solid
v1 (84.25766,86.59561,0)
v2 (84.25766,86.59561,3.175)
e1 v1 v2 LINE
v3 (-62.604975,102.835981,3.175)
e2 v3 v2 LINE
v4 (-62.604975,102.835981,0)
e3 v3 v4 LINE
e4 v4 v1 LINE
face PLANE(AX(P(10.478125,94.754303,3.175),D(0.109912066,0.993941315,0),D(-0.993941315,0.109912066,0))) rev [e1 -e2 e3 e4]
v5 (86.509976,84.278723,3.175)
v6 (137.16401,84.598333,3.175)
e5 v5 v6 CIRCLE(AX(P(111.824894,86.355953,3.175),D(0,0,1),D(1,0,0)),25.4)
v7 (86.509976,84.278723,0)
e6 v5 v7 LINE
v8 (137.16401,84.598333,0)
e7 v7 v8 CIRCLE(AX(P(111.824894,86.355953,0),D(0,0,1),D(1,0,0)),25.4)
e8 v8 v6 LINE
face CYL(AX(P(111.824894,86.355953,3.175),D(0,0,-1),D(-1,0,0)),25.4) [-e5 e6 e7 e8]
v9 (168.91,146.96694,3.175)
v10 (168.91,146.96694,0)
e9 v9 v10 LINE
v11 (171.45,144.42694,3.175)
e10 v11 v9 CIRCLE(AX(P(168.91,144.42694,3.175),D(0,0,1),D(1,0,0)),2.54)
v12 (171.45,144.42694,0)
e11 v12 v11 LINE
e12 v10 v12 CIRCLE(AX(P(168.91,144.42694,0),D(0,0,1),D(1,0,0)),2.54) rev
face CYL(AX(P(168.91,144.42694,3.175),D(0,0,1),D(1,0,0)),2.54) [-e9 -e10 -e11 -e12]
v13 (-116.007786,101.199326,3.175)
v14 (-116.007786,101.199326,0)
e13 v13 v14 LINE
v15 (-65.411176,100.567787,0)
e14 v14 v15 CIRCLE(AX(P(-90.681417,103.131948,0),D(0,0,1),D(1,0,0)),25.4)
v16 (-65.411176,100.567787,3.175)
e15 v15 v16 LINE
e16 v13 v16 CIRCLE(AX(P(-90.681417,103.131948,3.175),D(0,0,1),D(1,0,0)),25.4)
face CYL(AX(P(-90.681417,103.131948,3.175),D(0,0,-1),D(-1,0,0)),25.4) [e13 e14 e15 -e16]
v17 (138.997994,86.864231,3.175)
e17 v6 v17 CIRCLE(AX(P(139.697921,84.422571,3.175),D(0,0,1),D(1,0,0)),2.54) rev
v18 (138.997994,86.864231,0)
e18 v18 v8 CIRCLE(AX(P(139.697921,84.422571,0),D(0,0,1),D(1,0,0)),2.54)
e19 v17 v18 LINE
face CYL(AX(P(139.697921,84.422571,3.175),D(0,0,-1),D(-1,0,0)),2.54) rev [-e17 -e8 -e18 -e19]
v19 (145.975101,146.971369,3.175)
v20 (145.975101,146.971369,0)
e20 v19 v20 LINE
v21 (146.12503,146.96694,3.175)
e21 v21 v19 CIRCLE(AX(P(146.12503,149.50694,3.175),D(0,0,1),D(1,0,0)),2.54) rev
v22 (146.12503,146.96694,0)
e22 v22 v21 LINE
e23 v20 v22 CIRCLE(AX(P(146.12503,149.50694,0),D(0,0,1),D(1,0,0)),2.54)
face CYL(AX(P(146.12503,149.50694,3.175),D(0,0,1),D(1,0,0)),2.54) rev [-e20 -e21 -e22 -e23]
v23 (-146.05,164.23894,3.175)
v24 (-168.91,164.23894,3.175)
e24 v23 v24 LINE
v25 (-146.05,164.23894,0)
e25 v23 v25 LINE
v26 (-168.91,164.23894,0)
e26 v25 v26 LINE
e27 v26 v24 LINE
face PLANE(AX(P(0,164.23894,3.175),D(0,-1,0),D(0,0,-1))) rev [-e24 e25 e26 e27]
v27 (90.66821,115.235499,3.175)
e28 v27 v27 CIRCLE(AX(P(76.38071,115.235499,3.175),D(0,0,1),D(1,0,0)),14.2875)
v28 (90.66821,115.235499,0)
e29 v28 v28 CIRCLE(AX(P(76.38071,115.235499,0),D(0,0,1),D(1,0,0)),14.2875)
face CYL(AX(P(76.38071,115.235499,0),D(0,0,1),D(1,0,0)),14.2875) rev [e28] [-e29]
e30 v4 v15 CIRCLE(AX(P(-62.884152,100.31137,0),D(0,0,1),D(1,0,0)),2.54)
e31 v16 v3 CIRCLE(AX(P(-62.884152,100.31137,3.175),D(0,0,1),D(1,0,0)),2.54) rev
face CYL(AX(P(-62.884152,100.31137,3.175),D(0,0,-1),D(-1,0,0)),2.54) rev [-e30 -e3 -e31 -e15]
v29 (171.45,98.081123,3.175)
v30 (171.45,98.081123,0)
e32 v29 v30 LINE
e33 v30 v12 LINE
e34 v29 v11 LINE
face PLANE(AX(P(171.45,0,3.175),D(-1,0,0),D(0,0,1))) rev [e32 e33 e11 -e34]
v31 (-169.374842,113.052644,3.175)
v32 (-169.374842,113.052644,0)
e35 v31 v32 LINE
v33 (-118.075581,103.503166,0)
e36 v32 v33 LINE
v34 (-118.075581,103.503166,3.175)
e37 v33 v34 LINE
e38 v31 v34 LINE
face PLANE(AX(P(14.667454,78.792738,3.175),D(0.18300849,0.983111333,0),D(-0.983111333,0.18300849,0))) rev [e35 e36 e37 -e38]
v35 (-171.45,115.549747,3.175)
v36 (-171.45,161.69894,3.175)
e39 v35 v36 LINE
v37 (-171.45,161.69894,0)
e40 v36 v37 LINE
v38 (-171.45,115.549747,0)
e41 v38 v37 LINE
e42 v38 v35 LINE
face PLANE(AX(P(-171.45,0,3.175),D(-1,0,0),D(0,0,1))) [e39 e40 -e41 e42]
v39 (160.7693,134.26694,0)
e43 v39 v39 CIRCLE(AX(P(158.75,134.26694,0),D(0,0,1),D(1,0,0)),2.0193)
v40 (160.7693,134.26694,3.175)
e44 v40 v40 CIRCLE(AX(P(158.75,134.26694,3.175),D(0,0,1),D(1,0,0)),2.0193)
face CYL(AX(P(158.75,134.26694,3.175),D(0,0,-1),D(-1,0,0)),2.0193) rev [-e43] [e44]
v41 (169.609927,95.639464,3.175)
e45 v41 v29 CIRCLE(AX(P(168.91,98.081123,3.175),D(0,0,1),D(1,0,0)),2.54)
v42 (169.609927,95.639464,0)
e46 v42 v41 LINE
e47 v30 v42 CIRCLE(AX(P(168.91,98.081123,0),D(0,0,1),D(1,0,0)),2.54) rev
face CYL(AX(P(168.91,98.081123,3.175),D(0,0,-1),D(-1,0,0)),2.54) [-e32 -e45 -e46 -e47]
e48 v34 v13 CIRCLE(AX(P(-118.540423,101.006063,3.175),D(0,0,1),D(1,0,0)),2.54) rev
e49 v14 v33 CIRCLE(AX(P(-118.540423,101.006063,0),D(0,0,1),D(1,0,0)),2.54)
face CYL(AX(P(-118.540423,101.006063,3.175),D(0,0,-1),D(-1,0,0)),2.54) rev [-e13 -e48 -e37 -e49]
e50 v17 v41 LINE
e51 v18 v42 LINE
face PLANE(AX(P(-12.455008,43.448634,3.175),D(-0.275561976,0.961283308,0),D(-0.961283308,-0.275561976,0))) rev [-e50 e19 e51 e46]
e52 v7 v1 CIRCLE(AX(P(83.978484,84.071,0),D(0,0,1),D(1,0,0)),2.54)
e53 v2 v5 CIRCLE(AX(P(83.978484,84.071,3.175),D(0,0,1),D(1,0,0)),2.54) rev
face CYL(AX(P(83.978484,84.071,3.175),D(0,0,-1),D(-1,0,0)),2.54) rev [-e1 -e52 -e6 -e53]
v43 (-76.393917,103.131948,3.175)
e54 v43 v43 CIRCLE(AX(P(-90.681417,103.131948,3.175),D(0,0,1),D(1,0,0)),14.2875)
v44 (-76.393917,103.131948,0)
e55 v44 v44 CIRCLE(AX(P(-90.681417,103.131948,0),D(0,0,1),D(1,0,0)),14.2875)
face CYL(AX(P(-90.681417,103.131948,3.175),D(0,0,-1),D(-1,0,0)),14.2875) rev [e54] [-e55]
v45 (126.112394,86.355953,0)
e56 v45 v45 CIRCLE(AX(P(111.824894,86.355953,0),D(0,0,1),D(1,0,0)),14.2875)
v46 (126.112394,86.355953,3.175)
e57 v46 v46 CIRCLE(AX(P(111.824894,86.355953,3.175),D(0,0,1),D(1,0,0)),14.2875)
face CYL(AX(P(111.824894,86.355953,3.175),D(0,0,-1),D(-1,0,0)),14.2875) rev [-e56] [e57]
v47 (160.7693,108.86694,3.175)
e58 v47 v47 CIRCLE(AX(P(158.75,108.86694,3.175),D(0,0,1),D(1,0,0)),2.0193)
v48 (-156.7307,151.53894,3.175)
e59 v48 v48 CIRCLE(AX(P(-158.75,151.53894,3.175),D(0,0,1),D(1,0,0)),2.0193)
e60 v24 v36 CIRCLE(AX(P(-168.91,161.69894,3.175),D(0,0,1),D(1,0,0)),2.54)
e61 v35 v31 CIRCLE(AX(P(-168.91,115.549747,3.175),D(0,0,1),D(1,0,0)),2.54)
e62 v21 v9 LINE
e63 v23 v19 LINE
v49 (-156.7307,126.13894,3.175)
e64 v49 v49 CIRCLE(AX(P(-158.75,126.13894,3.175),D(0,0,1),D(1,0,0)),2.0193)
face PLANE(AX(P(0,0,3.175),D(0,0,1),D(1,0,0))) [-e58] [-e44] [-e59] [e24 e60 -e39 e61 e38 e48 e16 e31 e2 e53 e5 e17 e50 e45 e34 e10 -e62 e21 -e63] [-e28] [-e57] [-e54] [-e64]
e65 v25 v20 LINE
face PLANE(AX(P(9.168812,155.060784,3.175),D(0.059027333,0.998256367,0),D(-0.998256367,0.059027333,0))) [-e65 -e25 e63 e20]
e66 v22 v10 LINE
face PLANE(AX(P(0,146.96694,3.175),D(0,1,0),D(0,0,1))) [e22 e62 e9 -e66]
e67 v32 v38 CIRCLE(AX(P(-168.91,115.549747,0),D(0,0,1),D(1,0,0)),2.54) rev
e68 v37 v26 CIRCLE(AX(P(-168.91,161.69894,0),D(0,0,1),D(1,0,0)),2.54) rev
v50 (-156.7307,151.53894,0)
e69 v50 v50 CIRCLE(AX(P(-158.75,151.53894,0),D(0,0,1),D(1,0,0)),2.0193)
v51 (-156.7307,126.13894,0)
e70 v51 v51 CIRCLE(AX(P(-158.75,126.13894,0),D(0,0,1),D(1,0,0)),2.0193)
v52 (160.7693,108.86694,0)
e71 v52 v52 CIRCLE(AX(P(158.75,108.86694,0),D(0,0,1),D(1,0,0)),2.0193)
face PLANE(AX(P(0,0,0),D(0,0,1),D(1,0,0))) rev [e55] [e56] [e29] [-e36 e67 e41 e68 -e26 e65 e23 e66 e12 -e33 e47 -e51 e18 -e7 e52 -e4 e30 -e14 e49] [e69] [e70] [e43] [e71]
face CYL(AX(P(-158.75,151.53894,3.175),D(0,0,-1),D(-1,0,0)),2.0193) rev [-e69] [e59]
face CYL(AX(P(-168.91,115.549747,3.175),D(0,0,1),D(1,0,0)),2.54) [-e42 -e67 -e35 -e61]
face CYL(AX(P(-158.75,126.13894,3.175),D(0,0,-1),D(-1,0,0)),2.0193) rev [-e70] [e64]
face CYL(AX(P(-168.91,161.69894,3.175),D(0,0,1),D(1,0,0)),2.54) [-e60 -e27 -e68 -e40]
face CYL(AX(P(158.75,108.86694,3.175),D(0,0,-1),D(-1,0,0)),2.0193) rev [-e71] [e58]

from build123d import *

# Parameters (mm, degrees)
SKETCH1_R           = 14.2875
SKETCH1_R_2         = 2.0193
BOSS_EXTRUDE1_DEPTH = 3.175
FILLET1_R           = 2.54
SKETCH2_R           = 14.2875
CUT_EXTRUDE1_DEPTH  = 238.443914509


with BuildPart() as part:
    # Sketch1 → Boss-Extrude1 (new body)
    with BuildSketch(Plane.XY):
        with BuildLine():
            Line((-146.05, 164.23894), (-171.45, 164.23894))
            Line((-171.45, 164.23894), (-171.45, 113.43894))
            Line((-171.45, 113.43894), (-116.081416722, 103.131947821))
            ThreePointArc((-116.081416722, 103.131947821), (-90.681416722, 77.731947821), (-65.281416722, 103.131947821))
            Line((-65.281416722, 103.131947821), (86.42489431, 86.355953292))
            ThreePointArc((86.42489431, 86.355953292), (111.82489431, 60.955953292), (137.22489431, 86.355953292))
            Line((137.22489431, 86.355953292), (171.45, 96.16694))
            Line((171.45, 96.16694), (171.45, 146.96694))
            Line((171.45, 146.96694), (146.05, 146.96694))
            Line((146.05, 146.96694), (-146.05, 164.23894))
        make_face()
        with Locations((-90.681416722, 103.131947821)):
            Circle(SKETCH1_R, mode=Mode.SUBTRACT)
        with Locations((111.82489431, 86.355953292)):
            Circle(SKETCH1_R, mode=Mode.SUBTRACT)
        with Locations((-158.75, 151.53894)):
            Circle(SKETCH1_R_2, mode=Mode.SUBTRACT)
        with Locations((158.75, 134.26694)):
            Circle(SKETCH1_R_2, mode=Mode.SUBTRACT)
        with Locations((158.75, 108.86694)):
            Circle(SKETCH1_R_2, mode=Mode.SUBTRACT)
        with Locations((-158.75, 126.13894)):
            Circle(SKETCH1_R_2, mode=Mode.SUBTRACT)
    extrude(amount=BOSS_EXTRUDE1_DEPTH)

    # Fillet1
    # the kernel refuses this fillet: 2.54 mm, written as the material it adds along each edge
    with BuildSketch(Plane(origin=(-65.281416722, 103.131947821, 0), x_dir=(-0.05054020357066893, -0.9987220273044123, 0), z_dir=(0, 0, 1))) as fillet1_piece_1:
        with BuildLine():
            CenterArc((2.695814458, 2.536753949), FILLET1_R, 176.586727967, 90.516297483)
            Line((0.160320257, 2.687979466), (0, 0))
            ThreePointArc((0, 0), (1.283721171, 0.032460506), (2.567442341, 0))
        make_face()
    extrude(amount=3.175)
    with BuildSketch(Plane(origin=(-116.081416722, 103.131947821, 0), x_dir=(-0.983111332758604, 0.1830084899713721, 0), z_dir=(0, 0, 1))) as fillet1_piece_2:
        with BuildLine():
            CenterArc((2.028421781, 2.54), FILLET1_R, 194.908754381, 75.091245619)
            ThreePointArc((-0.42607364, 1.886507669), (-0.195074838, 0.947310604), (0, 0))
            Line((0, 0), (2.028421781, 0))
        make_face()
    extrude(amount=3.175)
    with BuildSketch(Plane(origin=(146.05, 146.96694, 0), x_dir=(1, 0, 0), z_dir=(0, 0, 1))) as fillet1_piece_3:
        with BuildLine():
            CenterArc((FILLET1_R * 0.0295394194537, FILLET1_R), FILLET1_R, 266.616015906, 3.383984094)
            Line((-FILLET1_R * 0.0294879135427, FILLET1_R * 0.00174363314861), (0, 0))
            Line((0, 0), (FILLET1_R * 0.0295394194537, 0))
        make_face()
    extrude(amount=3.175)
    with BuildSketch(Plane(origin=(137.22489431, 86.355953292, 0), x_dir=(0.9612833075503766, 0.275561976014486, 0), z_dir=(0, 0, 1))) as fillet1_piece_4:
        with BuildLine():
            CenterArc((1.844513026, -2.54), FILLET1_R, 90, 70.036589556)
            ThreePointArc((-0.542860523, -1.672793255), (-0.256948075, -0.841096436), (0, 0))
            Line((0, 0), (1.844513026, 0))
        make_face()
    extrude(amount=3.175)
    with BuildSketch(Plane(origin=(86.42489431, 86.355953292, 0), x_dir=(-0.9939413150469867, 0.10991206595577574, 0), z_dir=(0, 0, 1))) as fillet1_piece_5:
        with BuildLine():
            CenterArc((2.180444633, 2.54), FILLET1_R, 191.001176441, 78.998823559)
            ThreePointArc((-0.312878461, 2.055293957), (-0.13540237, 1.03084943), (0, 0))
            Line((0, 0), (2.180444633, 0))
        make_face()
    extrude(amount=3.175)
    # the kernel refuses this fillet: 2.54 mm, written as the material it takes off along each edge
    with BuildSketch(Plane(origin=(-171.45, 113.43894, -5.277017888), x_dir=(0, 1, 0), z_dir=(0, 0, 1))) as fillet1_2_piece_1:
        with BuildLine():
            CenterArc((FILLET1_R * 0.831026439026, -FILLET1_R), FILLET1_R, 90, 79.454954882)
            Line((-FILLET1_R * 0.152084893732, -FILLET1_R * 0.816991510029), (0, 0))
            Line((0, 0), (FILLET1_R * 0.831026439026, 0))
        make_face()
    extrude(amount=13.729035776, mode=Mode.SUBTRACT)
    with BuildSketch(Plane(origin=(-171.45, 164.23894, -6.35), x_dir=(1, 0, 0), z_dir=(0, 0, 1)), Plane(origin=(171.45, 146.96694, -6.35), x_dir=(0, -1, 0), z_dir=(0, 0, 1))) as fillet1_2_piece_2:
        with BuildLine():
            CenterArc((FILLET1_R, -FILLET1_R), FILLET1_R, 90, 90)
            Line((0, -FILLET1_R), (0, 0))
            Line((0, 0), (FILLET1_R, 0))
        make_face()
    extrude(amount=15.875, mode=Mode.SUBTRACT)
    with BuildSketch(Plane(origin=(171.45, 96.16694, -4.78545858), x_dir=(-0.9612833075503753, -0.2755619760144905, 0), z_dir=(0, 0, 1))) as fillet1_2_piece_3:
        with BuildLine():
            CenterArc((FILLET1_R * 0.753615524472, -FILLET1_R), FILLET1_R, 90, 74.004492945)
            Line((-FILLET1_R * 0.207667783079, -FILLET1_R * 0.724438023986), (0, 0))
            Line((0, 0), (FILLET1_R * 0.753615524472, 0))
        make_face()
    extrude(amount=12.745917161, mode=Mode.SUBTRACT)

    # Sketch2 → Cut-Extrude1 (cut, through all)
    with BuildSketch(Plane.XY.offset(3.175)):
        with Locations((76.380709606, 115.23549918)):
            Circle(SKETCH2_R)
    extrude(amount=-CUT_EXTRUDE1_DEPTH, mode=Mode.SUBTRACT)


solid = part.part
